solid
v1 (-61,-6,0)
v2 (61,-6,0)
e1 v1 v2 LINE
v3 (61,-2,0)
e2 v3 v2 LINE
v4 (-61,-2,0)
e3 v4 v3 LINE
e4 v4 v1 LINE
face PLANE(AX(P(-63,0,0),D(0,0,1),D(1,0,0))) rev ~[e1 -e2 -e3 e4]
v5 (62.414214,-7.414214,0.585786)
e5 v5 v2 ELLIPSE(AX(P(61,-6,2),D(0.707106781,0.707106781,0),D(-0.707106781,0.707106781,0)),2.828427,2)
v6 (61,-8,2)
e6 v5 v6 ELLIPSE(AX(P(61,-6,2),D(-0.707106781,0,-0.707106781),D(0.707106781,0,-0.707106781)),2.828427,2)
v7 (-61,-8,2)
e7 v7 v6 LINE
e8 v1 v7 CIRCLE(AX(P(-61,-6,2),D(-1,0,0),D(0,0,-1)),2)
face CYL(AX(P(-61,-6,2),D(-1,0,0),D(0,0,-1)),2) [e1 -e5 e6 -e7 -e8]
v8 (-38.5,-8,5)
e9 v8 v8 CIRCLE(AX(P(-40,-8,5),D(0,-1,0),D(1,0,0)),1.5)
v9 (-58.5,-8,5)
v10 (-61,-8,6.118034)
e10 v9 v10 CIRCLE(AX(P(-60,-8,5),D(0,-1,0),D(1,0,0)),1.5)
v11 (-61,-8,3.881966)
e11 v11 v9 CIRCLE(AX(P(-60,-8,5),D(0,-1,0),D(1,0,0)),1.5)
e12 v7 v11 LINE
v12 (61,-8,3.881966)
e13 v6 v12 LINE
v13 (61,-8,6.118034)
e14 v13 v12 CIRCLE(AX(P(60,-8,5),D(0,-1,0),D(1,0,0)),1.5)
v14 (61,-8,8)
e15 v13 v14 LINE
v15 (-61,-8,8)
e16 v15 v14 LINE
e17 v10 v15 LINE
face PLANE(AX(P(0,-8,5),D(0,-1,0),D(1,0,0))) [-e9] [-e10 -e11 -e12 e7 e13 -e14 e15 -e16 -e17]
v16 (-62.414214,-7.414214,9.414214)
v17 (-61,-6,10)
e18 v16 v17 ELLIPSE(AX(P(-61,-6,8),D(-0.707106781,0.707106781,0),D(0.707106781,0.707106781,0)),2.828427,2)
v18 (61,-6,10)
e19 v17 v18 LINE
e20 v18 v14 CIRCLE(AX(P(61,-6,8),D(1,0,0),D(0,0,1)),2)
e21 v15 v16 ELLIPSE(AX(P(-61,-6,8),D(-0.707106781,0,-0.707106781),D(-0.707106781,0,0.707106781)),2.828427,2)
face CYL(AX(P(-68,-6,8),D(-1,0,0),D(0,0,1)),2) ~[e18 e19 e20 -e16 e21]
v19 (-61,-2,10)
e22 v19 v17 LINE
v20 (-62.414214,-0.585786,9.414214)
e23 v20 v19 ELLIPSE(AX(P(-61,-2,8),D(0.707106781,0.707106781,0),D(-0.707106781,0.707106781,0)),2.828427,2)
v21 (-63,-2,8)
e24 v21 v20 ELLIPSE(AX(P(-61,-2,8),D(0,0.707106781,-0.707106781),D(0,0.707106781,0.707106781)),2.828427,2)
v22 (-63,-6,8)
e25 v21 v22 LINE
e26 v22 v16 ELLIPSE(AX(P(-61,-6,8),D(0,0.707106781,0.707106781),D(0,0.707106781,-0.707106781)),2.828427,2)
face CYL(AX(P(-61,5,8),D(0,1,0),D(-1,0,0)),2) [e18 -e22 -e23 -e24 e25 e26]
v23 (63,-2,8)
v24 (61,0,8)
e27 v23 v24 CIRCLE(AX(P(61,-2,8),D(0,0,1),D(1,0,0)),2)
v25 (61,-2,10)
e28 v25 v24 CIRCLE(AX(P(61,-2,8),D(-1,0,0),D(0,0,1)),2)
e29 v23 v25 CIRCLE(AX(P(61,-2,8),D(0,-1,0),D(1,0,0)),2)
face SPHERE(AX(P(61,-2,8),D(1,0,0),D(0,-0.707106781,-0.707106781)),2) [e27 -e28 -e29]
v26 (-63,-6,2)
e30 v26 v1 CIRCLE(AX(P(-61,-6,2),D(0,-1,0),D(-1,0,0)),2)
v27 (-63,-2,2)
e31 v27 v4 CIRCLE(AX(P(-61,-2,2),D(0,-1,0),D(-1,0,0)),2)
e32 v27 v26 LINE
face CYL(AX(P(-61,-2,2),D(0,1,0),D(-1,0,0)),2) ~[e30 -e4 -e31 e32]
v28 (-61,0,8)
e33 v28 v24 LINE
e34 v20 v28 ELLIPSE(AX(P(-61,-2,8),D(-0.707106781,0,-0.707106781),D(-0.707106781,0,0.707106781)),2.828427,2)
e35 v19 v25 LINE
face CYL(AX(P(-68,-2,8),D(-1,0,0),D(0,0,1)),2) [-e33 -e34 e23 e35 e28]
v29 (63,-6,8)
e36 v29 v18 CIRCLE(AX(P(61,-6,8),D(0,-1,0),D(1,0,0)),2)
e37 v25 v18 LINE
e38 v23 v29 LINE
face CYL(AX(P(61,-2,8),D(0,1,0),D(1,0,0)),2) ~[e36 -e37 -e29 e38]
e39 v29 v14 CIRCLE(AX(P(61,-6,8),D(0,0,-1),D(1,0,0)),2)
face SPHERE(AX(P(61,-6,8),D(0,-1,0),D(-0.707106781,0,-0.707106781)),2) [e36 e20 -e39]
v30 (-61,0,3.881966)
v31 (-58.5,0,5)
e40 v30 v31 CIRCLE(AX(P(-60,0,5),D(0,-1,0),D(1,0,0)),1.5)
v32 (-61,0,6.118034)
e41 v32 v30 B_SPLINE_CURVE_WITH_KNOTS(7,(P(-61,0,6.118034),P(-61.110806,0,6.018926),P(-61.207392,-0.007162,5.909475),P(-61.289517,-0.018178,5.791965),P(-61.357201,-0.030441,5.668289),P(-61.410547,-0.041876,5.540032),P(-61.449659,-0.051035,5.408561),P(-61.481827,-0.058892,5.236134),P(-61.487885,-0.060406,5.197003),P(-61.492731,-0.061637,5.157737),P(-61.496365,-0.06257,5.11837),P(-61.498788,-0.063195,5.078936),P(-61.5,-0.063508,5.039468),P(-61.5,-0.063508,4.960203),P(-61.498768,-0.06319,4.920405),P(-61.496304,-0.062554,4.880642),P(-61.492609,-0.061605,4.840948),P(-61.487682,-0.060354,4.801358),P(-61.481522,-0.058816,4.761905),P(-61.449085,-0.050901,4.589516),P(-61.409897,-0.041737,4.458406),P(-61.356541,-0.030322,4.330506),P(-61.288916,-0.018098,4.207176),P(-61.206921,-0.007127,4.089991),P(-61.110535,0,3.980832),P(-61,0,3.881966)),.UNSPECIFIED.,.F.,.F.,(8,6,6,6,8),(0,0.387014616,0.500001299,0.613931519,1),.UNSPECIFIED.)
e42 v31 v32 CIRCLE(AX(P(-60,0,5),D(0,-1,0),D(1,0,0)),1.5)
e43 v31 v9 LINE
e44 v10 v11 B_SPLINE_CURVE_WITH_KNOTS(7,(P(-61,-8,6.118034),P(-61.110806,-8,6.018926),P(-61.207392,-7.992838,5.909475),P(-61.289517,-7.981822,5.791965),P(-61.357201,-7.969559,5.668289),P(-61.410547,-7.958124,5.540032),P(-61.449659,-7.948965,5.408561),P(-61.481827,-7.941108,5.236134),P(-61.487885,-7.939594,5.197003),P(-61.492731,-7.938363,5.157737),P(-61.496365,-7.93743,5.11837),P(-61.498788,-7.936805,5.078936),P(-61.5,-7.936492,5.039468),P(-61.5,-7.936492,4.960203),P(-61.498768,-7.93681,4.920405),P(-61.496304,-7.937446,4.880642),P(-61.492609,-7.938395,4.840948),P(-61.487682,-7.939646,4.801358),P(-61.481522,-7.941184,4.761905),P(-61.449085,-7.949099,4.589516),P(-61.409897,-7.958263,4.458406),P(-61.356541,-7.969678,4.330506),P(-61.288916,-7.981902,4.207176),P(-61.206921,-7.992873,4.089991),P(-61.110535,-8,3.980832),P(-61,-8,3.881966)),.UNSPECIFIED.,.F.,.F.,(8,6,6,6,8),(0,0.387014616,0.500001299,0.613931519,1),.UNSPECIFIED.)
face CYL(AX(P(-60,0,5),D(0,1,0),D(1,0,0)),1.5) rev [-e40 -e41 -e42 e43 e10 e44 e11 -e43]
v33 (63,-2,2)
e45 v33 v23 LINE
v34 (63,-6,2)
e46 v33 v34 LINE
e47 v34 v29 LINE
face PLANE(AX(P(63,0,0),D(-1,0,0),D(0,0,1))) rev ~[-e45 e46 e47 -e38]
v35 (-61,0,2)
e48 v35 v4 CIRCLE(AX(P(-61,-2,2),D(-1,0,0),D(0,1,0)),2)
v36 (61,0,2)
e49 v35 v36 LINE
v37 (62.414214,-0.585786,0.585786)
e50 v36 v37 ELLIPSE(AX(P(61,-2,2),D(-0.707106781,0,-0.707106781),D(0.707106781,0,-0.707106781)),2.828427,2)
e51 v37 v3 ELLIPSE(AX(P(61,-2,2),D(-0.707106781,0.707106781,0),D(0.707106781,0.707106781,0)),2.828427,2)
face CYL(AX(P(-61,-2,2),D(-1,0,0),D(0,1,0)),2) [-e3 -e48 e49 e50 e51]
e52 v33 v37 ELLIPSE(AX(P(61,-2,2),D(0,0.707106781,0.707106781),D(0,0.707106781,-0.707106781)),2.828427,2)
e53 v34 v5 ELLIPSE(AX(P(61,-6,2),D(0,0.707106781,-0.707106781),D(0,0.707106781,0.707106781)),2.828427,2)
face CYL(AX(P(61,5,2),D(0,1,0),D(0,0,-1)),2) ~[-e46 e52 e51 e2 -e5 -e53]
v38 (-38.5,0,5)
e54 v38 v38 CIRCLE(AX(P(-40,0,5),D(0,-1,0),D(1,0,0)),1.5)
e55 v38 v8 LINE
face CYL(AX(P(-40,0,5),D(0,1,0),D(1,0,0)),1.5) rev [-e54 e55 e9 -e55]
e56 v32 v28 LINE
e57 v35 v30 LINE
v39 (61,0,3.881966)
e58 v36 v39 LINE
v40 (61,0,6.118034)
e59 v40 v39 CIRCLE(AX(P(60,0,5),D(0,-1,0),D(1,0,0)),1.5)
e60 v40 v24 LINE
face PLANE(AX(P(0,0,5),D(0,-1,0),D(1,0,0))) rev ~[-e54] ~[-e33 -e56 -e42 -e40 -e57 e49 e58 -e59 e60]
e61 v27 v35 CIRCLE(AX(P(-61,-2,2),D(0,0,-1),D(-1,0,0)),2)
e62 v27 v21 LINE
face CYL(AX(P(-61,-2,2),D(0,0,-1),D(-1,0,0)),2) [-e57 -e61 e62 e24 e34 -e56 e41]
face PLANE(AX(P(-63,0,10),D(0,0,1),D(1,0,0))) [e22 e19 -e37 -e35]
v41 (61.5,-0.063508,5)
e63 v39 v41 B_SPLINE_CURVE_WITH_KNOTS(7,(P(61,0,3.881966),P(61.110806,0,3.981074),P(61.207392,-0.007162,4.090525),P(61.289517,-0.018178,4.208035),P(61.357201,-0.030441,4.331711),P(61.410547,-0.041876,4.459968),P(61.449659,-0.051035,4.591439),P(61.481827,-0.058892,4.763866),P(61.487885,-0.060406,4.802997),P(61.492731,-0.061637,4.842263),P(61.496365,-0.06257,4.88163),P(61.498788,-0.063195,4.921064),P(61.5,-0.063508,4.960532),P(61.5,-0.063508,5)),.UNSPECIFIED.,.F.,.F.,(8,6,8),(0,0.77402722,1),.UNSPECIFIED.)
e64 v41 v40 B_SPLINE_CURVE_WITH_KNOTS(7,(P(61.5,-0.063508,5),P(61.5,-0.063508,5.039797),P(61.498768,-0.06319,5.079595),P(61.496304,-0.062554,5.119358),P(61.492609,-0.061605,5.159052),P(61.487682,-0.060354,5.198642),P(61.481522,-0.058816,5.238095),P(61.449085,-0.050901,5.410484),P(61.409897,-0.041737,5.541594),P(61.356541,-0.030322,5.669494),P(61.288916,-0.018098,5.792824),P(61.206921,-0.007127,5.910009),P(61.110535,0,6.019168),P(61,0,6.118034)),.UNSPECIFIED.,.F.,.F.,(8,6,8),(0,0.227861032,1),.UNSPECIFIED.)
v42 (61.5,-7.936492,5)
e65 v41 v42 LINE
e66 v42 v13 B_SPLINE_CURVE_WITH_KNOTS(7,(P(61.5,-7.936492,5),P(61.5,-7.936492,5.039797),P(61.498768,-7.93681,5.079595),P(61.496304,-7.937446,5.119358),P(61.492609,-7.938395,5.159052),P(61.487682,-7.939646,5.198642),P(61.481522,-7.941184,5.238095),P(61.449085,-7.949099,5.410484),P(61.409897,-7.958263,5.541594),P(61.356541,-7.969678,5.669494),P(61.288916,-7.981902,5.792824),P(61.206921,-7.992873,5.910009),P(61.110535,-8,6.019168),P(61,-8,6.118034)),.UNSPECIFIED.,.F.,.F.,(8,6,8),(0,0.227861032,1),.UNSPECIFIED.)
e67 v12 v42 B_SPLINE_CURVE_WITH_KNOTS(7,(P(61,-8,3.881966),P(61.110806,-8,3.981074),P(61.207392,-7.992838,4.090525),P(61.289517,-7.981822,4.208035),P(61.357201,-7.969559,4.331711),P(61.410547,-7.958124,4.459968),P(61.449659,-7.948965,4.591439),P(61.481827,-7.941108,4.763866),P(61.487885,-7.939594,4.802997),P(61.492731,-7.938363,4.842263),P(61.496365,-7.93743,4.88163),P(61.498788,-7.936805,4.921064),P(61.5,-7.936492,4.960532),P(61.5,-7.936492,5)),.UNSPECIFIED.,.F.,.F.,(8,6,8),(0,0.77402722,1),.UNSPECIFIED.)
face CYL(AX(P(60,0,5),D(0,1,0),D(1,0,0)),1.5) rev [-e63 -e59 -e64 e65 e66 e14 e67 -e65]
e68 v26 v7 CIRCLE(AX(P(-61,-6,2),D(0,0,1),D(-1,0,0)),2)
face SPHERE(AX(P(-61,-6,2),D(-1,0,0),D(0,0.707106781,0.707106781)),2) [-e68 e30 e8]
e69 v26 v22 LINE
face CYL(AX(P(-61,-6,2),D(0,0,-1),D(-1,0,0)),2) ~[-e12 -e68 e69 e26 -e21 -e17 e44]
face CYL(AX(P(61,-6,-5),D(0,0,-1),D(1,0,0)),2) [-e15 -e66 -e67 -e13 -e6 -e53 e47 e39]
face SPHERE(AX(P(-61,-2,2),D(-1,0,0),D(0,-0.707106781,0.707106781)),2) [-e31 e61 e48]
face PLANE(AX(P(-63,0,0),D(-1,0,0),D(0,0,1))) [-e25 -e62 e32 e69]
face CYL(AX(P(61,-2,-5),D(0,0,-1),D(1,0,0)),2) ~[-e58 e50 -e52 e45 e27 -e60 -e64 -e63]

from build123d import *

# Parameters (mm, degrees)
F0_W         = 126
F0_H         = 10
F0_R         = 1.5
F1_DEPTH     = 8
F2_T1_DEPTH  = 4
F2_T3_DEPTH  = 18
F2_T5_DEPTH  = 129
F2_T7_DEPTH  = 13
F2_S11_W     = 2
F2_S11_H     = 2
F2_T12_DEPTH = 2
F2_S17_W     = 2
F2_S17_H     = 2
F2_T18_DEPTH = 2
F3_T1_DEPTH  = 11
F3_T3_DEPTH  = 4
F3_T5_DEPTH  = 127
F3_S9_W      = 2.04
F3_S9_H      = 2.04
F3_T10_DEPTH = 2.04
F3_S15_W     = 2.04
F3_S15_H     = 2.04
F3_T16_DEPTH = 2.04


# Not quite as in the source:
# - a fillet or chamfer that OpenCascade refuses, or shapes differently, is made with other operations: its cross-section is extruded or revolved along the edge and cut away or added


with BuildPart() as f1:
    # F0 (on Front) → F1 (new body)
    with BuildSketch(Plane.XZ):
        with Locations((0, 5)):
            Rectangle(F0_W, F0_H)
        with Locations((-60, 5)):
            Circle(F0_R, mode=Mode.SUBTRACT)
        with Locations((-40, 5)):
            Circle(F0_R, mode=Mode.SUBTRACT)
        with Locations((60, 5)):
            Circle(F0_R, mode=Mode.SUBTRACT)
    extrude(amount=F1_DEPTH)

    # F2: fillet of radius 2 on 7 edges, made by hand

    # F2_s2 → F2_t1 (cut)
    with BuildSketch(Plane.XZ.offset(2)):
        with BuildLine():
            ThreePointArc((63, 8), (62.4142135624, 9.4142135624), (61, 10))
            Line((61, 10), (63, 10))
            Line((63, 10), (63, 8))
        make_face()
    extrude(amount=F2_T1_DEPTH, mode=Mode.SUBTRACT)

    # F2_s4 → F2_t3 (cut)
    with BuildSketch(Plane.XZ.offset(-5)):
        with BuildLine():
            ThreePointArc((-63, 8), (-62.4142135624, 9.4142135624), (-61, 10))
            Line((-61, 10), (-63, 10))
            Line((-63, 10), (-63, 8))
        make_face()
        with BuildLine():
            ThreePointArc((61, 0), (62.4142135624, 0.5857864376), (63, 2))
            Line((63, 2), (63, 0))
            Line((63, 0), (61, 0))
        make_face()
    extrude(amount=F2_T3_DEPTH, mode=Mode.SUBTRACT)

    # F2_s6 → F2_t5 (cut)
    with BuildSketch(Plane.YZ.offset(-68)):
        with BuildLine():
            ThreePointArc((-2, 10), (-0.5857864376, 9.4142135624), (0, 8))
            Line((0, 8), (0, 10))
            Line((0, 10), (-2, 10))
        make_face()
        with BuildLine():
            ThreePointArc((-6, 10), (-7.4142135624, 9.4142135624), (-8, 8))
            Line((-8, 8), (-8, 10))
            Line((-8, 10), (-6, 10))
        make_face()
    extrude(amount=F2_T5_DEPTH, mode=Mode.SUBTRACT)

    # F2_s8 → F2_t7 (cut)
    with BuildSketch(Plane.XY.offset(-5)):
        with BuildLine():
            ThreePointArc((63, -2), (62.4142135624, -0.5857864376), (61, 0))
            Line((61, 0), (63, 0))
            Line((63, 0), (63, -2))
        make_face()
        with BuildLine():
            ThreePointArc((63, -6), (62.4142135624, -7.4142135624), (61, -8))
            Line((61, -8), (63, -8))
            Line((63, -8), (63, -6))
        make_face()
    extrude(amount=F2_T7_DEPTH, mode=Mode.SUBTRACT)


with BuildPart() as f2_tool10:
    # F2_s11 → F2_t12 (new body)
    with BuildSketch(Plane.YZ.offset(61)):
        with Locations((-1, 9)):
            Rectangle(F2_S11_W, F2_S11_H)
    extrude(amount=F2_T12_DEPTH)

    # F2_s13 → F2_t14 (revolve, cut)
    with BuildSketch(Plane(origin=(61, -2, 8), x_dir=(0, -0.7071067812, -0.7071067812), z_dir=(0, -0.7071067812, 0.7071067812))):
        with BuildLine():
            ThreePointArc((0, -2), (2, 0), (0, 2))
            Line((0, 2), (0, -2))
        make_face()
    revolve(axis=Axis((61, -2, 8), (1, 0, 0)), mode=Mode.SUBTRACT)


with BuildPart() as f1_1:
    add(f1.part)

    # F2_t9: cut F2_tool10
    add(f2_tool10.part, mode=Mode.SUBTRACT)


with BuildPart() as f2_tool16:
    # F2_s17 → F2_t18 (new body)
    with BuildSketch(Plane.XZ.offset(6)):
        with Locations((62, 9)):
            Rectangle(F2_S17_W, F2_S17_H)
    extrude(amount=F2_T18_DEPTH)

    # F2_s19 → F2_t20 (revolve, cut)
    with BuildSketch(Plane(origin=(61, -6, 8), x_dir=(-0.7071067812, 0, -0.7071067812), z_dir=(-0.7071067812, 0, 0.7071067812))):
        with BuildLine():
            ThreePointArc((0, -2), (2, 0), (0, 2))
            Line((0, 2), (0, -2))
        make_face()
    revolve(axis=Axis((61, -6, 8), (0, -1, 0)), mode=Mode.SUBTRACT)


with BuildPart() as f1_2:
    add(f1_1.part)

    # F2_t15: cut F2_tool16
    add(f2_tool16.part, mode=Mode.SUBTRACT)

    # F3: fillet of radius 2 on 7 edges, made by hand

    # F3_s2 → F3_t1 (cut)
    with BuildSketch(Plane.XY.offset(2)):
        with BuildLine():
            ThreePointArc((-63, -2), (-62.4142135624, -0.5857864376), (-61, 0))
            Line((-61, 0), (-63, 0))
            Line((-63, 0), (-63, -2))
        make_face()
        with BuildLine():
            ThreePointArc((-63, -6), (-62.4142135624, -7.4142135624), (-61, -8))
            Line((-61, -8), (-63, -8))
            Line((-63, -8), (-63, -6))
        make_face()
    extrude(amount=F3_T1_DEPTH, mode=Mode.SUBTRACT)

    # F3_s4 → F3_t3 (cut)
    with BuildSketch(Plane.XZ.offset(2)):
        with BuildLine():
            ThreePointArc((-63, 2), (-62.4142135624, 0.5857864376), (-61, 0))
            Line((-61, 0), (-63, 0))
            Line((-63, 0), (-63, 2))
        make_face()
    extrude(amount=F3_T3_DEPTH, mode=Mode.SUBTRACT)

    # F3_s6 → F3_t5 (cut)
    with BuildSketch(Plane.YZ.offset(-61)):
        with BuildLine():
            ThreePointArc((0, 2), (-0.5857864376, 0.5857864376), (-2, 0))
            Line((-2, 0), (0, 0))
            Line((0, 0), (0, 2))
        make_face()
        with BuildLine():
            ThreePointArc((-6, 0), (-7.4142135624, 0.5857864376), (-8, 2))
            Line((-8, 2), (-8, 0))
            Line((-8, 0), (-6, 0))
        make_face()
    extrude(amount=F3_T5_DEPTH, mode=Mode.SUBTRACT)


with BuildPart() as f3_tool8:
    # F3_s9 → F3_t10 (new body)
    with BuildSketch(Plane.YZ.offset(-61)):
        with Locations((-0.98, 0.98)):
            Rectangle(F3_S9_W, F3_S9_H)
    extrude(amount=-F3_T10_DEPTH)

    # F3_s11 → F3_t12 (revolve, cut)
    with BuildSketch(Plane(origin=(-61, -2, 2), x_dir=(0, -0.7071067812, 0.7071067812), z_dir=(0, -0.7071067812, -0.7071067812))):
        with BuildLine():
            ThreePointArc((0, -2), (2, 0), (0, 2))
            Line((0, 2), (0, -2))
        make_face()
    revolve(axis=Axis((-61, -2, 2), (-1, 0, 0)), mode=Mode.SUBTRACT)


with BuildPart() as f1_3:
    add(f1_2.part)

    # F3_t7: cut F3_tool8
    add(f3_tool8.part, mode=Mode.SUBTRACT)


with BuildPart() as f3_tool14:
    # F3_s15 → F3_t16 (new body)
    with BuildSketch(Plane.YZ.offset(-61)):
        with Locations((-7.02, 0.98)):
            Rectangle(F3_S15_W, F3_S15_H)
    extrude(amount=-F3_T16_DEPTH)

    # F3_s17 → F3_t18 (revolve, cut)
    with BuildSketch(Plane(origin=(-61, -6, 2), x_dir=(0, 0.7071067812, 0.7071067812), z_dir=(0, -0.7071067812, 0.7071067812))):
        with BuildLine():
            ThreePointArc((0, -2), (2, 0), (0, 2))
            Line((0, 2), (0, -2))
        make_face()
    revolve(axis=Axis((-61, -6, 2), (-1, 0, 0)), mode=Mode.SUBTRACT)


with BuildPart() as f1_4:
    add(f1_3.part)

    # F3_t13: cut F3_tool14
    add(f3_tool14.part, mode=Mode.SUBTRACT)


solid = f1_4.part
